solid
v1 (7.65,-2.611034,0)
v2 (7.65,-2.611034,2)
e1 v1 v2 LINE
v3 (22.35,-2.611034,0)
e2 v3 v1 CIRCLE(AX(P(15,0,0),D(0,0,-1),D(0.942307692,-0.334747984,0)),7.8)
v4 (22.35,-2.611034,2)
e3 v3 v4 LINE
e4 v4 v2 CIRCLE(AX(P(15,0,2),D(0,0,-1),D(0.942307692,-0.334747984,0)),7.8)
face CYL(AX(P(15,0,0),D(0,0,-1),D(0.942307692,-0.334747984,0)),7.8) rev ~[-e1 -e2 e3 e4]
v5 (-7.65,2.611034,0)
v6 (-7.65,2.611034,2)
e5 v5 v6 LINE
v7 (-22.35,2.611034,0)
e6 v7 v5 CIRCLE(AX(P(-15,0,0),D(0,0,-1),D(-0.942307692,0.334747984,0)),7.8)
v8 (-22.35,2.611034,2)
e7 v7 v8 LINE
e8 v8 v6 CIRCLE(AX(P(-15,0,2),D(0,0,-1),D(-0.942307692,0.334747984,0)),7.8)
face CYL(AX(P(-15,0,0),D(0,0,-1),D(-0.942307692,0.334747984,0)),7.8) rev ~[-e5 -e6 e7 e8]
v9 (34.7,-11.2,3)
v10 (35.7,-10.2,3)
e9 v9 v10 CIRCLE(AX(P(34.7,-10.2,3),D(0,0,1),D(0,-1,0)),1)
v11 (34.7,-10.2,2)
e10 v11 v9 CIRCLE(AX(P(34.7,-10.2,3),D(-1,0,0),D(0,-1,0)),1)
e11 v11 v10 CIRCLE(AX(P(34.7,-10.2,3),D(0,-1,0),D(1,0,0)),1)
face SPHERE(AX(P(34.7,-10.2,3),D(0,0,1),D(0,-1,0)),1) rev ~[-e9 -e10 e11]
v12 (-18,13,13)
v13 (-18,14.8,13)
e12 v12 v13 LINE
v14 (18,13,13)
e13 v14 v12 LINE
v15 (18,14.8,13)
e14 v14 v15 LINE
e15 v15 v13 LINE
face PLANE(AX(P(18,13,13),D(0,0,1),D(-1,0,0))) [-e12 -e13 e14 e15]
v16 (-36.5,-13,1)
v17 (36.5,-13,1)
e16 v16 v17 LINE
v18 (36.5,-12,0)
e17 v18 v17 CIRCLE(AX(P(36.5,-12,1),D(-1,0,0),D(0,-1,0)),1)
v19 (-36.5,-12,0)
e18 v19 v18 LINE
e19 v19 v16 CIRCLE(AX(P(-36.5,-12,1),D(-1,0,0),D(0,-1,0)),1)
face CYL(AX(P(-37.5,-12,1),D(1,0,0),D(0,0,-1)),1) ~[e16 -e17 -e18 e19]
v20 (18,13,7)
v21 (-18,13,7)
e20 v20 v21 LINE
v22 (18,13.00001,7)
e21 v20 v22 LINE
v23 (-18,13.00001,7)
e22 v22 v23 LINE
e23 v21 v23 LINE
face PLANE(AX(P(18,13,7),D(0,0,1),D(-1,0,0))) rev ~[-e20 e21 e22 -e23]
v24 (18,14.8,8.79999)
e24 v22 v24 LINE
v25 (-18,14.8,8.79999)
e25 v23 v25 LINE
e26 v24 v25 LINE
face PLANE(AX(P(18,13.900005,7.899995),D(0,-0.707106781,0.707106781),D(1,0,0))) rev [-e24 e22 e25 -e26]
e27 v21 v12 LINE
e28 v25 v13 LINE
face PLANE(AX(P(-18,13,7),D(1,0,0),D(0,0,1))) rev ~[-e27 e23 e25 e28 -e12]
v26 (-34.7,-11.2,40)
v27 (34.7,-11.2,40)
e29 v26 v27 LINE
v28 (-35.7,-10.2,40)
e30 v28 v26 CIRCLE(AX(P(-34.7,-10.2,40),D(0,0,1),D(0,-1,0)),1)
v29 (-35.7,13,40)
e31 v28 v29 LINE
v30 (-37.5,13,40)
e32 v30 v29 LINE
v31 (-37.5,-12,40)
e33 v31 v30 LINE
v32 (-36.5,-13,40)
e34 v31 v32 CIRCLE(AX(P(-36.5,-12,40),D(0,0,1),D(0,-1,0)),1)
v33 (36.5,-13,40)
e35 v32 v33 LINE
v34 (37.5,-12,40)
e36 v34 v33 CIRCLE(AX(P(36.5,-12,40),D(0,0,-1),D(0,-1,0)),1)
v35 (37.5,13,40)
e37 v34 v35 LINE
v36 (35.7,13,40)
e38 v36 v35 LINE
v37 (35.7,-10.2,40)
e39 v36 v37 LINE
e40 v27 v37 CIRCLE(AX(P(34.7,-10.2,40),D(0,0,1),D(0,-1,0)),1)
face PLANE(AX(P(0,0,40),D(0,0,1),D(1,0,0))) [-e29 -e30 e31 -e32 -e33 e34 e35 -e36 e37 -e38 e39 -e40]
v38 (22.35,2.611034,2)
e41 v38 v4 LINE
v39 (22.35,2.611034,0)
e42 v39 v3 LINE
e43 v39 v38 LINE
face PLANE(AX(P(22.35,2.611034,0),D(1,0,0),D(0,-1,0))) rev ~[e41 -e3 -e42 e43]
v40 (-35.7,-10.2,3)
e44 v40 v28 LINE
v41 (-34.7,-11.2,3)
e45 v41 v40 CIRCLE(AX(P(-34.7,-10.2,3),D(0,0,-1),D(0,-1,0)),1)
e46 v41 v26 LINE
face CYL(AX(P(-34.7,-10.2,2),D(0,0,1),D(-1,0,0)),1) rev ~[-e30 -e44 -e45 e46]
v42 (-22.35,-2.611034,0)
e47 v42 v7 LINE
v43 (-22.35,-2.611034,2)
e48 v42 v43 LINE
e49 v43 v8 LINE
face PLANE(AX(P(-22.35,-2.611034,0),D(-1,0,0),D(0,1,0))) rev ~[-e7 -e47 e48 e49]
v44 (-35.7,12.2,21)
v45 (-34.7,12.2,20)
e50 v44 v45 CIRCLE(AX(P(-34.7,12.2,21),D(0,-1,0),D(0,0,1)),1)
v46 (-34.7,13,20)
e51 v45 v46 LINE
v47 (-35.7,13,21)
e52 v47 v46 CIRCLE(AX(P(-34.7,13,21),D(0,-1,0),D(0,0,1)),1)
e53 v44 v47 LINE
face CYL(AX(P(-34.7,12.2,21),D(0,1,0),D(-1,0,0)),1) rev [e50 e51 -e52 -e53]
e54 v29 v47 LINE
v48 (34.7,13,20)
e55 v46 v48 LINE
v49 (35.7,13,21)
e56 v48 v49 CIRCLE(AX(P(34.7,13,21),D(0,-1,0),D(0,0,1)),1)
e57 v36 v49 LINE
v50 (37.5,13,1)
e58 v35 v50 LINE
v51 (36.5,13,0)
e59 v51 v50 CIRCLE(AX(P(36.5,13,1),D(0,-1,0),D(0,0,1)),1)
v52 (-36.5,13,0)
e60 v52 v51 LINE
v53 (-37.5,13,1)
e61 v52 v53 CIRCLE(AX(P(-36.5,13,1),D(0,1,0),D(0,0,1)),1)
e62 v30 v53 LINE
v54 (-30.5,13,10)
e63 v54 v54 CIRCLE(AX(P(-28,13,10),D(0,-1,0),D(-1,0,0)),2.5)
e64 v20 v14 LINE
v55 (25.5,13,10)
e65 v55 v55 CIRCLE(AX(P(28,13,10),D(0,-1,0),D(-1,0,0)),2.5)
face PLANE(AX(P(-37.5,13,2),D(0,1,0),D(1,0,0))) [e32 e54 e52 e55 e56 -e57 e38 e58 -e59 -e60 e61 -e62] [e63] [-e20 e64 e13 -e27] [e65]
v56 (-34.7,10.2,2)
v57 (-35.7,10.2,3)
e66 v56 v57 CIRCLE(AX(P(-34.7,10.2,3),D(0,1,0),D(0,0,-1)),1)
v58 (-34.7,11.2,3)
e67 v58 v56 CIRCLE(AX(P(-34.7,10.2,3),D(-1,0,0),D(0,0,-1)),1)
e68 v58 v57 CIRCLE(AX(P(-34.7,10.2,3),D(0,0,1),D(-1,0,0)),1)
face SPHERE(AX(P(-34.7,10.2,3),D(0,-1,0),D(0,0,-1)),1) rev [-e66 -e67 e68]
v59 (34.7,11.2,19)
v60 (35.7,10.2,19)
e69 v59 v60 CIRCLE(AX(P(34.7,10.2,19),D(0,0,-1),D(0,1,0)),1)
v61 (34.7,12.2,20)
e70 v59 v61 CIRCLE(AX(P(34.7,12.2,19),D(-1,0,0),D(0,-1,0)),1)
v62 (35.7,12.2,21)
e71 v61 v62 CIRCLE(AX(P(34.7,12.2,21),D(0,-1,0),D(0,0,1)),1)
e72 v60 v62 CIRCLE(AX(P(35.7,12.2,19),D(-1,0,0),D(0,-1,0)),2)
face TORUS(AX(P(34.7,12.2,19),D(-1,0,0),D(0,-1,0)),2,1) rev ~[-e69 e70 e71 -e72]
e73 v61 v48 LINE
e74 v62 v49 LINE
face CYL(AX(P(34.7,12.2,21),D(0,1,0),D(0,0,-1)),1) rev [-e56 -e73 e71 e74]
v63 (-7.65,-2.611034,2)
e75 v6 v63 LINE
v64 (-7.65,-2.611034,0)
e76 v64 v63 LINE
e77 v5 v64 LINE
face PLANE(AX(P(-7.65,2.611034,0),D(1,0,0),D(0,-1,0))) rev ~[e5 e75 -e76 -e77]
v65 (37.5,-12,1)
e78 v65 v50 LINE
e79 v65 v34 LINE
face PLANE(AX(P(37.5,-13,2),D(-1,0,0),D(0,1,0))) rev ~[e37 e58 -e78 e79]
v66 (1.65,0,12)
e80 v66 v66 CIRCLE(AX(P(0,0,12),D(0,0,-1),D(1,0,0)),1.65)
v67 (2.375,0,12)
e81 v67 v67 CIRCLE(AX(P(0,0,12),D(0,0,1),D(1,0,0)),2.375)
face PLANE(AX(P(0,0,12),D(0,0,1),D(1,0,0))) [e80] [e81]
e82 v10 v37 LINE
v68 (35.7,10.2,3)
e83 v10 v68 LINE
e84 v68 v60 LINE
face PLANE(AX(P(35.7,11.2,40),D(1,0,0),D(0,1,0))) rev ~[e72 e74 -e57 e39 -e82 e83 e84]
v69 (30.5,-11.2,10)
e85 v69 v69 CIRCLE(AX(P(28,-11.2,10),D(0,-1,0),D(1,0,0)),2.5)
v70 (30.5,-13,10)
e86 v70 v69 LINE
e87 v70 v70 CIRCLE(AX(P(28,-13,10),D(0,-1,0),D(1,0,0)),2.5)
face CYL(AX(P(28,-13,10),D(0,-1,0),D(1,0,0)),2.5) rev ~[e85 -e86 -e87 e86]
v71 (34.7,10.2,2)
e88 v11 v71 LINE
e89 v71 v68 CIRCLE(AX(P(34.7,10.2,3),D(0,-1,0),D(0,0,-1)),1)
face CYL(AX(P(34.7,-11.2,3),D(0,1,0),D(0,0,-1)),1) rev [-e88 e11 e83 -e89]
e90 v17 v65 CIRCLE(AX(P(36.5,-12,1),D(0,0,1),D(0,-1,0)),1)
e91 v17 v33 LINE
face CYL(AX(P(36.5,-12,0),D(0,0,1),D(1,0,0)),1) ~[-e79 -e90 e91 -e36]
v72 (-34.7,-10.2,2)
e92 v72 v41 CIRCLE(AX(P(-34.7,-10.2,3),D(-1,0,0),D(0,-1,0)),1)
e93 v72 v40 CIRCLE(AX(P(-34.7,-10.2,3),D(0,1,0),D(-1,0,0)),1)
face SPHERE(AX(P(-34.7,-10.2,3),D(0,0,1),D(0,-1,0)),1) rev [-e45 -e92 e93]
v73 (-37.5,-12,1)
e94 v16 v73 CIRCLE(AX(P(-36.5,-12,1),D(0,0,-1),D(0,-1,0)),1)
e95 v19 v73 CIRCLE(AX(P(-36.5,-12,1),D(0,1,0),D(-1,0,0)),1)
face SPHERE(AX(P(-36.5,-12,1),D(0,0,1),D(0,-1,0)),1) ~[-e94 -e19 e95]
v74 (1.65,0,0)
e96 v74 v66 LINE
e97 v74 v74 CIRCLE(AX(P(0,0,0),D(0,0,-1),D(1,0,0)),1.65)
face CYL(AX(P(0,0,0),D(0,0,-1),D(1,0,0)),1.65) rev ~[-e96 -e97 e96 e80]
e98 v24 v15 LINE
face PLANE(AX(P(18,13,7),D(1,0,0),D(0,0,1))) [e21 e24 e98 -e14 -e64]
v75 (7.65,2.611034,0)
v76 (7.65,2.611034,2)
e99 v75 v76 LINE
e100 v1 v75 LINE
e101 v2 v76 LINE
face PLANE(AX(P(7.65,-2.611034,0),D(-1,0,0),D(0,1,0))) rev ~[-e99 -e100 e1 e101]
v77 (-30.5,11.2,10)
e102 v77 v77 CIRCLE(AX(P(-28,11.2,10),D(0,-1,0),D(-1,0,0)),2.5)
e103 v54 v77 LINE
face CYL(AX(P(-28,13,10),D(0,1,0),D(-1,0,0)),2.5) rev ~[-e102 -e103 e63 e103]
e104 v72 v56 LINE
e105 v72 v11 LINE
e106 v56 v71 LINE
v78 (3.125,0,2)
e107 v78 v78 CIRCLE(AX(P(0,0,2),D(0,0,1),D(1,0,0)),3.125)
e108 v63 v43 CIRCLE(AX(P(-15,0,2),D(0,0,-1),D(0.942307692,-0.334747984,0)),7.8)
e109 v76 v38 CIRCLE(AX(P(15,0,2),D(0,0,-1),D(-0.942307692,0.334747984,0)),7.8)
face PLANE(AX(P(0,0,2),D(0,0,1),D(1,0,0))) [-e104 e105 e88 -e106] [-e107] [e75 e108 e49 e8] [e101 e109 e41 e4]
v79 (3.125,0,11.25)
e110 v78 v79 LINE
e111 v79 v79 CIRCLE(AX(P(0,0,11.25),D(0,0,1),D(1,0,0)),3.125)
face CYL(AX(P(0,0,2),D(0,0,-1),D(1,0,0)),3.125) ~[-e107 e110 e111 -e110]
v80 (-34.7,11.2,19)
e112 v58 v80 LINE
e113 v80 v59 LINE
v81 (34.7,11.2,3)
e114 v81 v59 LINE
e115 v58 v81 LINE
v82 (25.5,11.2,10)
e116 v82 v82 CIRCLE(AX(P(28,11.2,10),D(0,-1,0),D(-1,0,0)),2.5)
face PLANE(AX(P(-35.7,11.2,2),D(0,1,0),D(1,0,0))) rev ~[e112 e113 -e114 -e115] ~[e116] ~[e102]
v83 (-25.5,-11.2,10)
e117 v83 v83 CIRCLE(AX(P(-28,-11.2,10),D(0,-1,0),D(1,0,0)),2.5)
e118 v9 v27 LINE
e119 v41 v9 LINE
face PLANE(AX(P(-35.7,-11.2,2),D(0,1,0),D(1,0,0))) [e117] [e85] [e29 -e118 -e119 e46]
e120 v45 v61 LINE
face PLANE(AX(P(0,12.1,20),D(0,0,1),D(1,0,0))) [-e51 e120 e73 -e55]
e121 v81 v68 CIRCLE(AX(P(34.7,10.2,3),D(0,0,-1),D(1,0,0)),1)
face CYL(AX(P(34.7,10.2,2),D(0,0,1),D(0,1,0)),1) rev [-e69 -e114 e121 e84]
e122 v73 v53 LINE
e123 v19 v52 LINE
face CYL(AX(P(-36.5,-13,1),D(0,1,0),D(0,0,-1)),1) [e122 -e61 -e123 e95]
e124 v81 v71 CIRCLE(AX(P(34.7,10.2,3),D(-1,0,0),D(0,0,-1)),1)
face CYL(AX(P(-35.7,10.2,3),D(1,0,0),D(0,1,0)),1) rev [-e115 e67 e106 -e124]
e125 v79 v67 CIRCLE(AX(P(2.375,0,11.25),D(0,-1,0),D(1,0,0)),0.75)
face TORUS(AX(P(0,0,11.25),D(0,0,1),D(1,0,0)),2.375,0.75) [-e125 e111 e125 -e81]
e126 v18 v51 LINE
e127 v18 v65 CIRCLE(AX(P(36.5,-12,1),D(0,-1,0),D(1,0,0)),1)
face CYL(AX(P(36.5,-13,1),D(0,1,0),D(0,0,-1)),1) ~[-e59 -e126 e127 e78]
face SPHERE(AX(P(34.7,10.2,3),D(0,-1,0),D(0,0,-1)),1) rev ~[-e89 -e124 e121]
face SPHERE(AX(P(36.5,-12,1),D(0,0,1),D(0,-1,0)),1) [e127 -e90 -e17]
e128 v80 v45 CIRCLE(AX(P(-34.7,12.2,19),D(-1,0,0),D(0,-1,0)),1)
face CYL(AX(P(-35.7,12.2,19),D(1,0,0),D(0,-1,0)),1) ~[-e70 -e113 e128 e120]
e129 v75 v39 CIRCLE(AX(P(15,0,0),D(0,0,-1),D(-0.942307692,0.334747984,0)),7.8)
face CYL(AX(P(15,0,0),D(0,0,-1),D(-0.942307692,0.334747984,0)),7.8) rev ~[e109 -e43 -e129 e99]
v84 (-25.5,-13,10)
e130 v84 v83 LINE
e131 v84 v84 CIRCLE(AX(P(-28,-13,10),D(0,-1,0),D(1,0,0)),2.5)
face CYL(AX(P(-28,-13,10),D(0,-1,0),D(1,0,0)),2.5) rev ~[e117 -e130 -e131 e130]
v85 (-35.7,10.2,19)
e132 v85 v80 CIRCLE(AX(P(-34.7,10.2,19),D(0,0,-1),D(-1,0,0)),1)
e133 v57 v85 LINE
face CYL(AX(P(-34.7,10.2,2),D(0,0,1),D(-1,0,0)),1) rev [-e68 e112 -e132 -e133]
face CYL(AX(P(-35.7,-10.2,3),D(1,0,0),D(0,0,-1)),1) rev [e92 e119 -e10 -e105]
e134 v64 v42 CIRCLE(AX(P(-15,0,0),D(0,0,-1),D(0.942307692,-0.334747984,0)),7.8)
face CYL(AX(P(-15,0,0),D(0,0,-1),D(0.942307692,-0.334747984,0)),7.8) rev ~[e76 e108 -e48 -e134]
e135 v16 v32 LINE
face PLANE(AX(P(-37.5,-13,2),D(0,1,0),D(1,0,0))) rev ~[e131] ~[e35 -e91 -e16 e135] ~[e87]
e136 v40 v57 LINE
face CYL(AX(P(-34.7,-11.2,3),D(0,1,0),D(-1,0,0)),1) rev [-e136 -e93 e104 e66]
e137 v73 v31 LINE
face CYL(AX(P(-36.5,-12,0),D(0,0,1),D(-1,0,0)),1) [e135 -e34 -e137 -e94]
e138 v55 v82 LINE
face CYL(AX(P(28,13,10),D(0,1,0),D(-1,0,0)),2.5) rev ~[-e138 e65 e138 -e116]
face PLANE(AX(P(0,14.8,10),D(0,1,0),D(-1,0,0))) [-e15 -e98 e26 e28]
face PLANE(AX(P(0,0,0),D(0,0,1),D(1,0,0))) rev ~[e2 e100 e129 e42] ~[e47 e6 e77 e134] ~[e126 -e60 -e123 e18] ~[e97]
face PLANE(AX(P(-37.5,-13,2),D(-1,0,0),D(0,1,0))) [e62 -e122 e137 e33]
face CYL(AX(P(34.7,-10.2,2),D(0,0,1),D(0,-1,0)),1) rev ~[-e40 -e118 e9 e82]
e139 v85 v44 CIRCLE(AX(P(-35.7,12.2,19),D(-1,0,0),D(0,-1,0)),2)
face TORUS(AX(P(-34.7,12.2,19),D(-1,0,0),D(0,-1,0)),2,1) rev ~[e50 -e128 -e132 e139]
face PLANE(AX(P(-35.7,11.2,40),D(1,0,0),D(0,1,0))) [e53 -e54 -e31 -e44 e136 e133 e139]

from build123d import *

# Parameters (mm, degrees)
F0_W      = 75
F0_H      = 26
F1_DEPTH  = 2
F2_W      = 75
F2_H      = 26
F2_W_2    = 71.4
F2_H_2    = 22.4
F3_DEPTH  = 38
F5_DEPTH  = 2
F6_R      = 2.5
F7_DEPTH  = 1.8
F8_W      = 36
F8_H      = 6
F9_DEPTH  = 1.8
F10_SIZE  = 1.79999
F11_W     = 71.4
F11_H     = 1.8
F12_DEPTH = 20
F13_R     = 3.125
F14_DEPTH = 10
F15_R     = 0.75
F16_R     = 1.65
F17_DEPTH = 40.001
F18_F1_R  = 1
F18_F2_R  = 1
F19_R     = 2.5
F20_DEPTH = 27.801


# Not quite as in the source:
# - a fillet or chamfer is up to 0.001 mm smaller than in the source, because OpenCascade refuses the exact size


with BuildPart() as f1:
    # F0 (on Top) → F1 (new body)
    with BuildSketch(Plane.XY):
        Rectangle(F0_W, F0_H)
    extrude(amount=F1_DEPTH)

    # F2 (on face) → F3 (join)
    with BuildSketch(Plane.XY.offset(2)):
        Rectangle(F2_W, F2_H)
        Rectangle(F2_W_2, F2_H_2, mode=Mode.SUBTRACT)
    extrude(amount=F3_DEPTH)

    # F4 (on face) → F5 (cut, through all)
    with BuildSketch(Plane(origin=(0, 0, 0), x_dir=(1, 0, 0), z_dir=(0, 0, -1))):
        with BuildLine():
            Line((-22.35, 2.6110342778), (-22.35, -2.6110342778))
            ThreePointArc((-22.35, -2.6110342778), (-15, -7.8), (-7.65, -2.6110342778))
            Line((-7.65, -2.6110342778), (-7.65, 2.6110342778))
            ThreePointArc((-7.65, 2.6110342778), (-15, 7.8), (-22.35, 2.6110342778))
        make_face()
        with BuildLine():
            ThreePointArc((22.35, 2.6110342778), (15, 7.8), (7.65, 2.6110342778))
            Line((7.65, 2.6110342778), (7.65, -2.6110342778))
            ThreePointArc((7.65, -2.6110342778), (15, -7.8), (22.35, -2.6110342778))
            Line((22.35, -2.6110342778), (22.35, 2.6110342778))
        make_face()
    extrude(amount=-F5_DEPTH, mode=Mode.SUBTRACT)

    # F6 (on face) → F7 (cut, through all)
    with BuildSketch(Plane(origin=(0, 13, 0), x_dir=(-1, 0, 0), z_dir=(0, 1, 0))):
        with Locations((28, 10)):
            Circle(F6_R)
        with Locations((-28, 10)):
            Circle(F6_R)
    extrude(amount=-F7_DEPTH, mode=Mode.SUBTRACT)

    # F8 (on face) → F9 (join)
    with BuildSketch(Plane(origin=(0, 13, 0), x_dir=(-1, 0, 0), z_dir=(0, 1, 0))):
        with Locations((0, 10)):
            Rectangle(F8_W, F8_H)
    extrude(amount=F9_DEPTH)

    # F10 (size 1.8 in the source; OpenCascade refuses exactly that, so slightly less here)
    f10_edges = [f1.edges().sort_by_distance(p)[0] for p in [
        (0, 14.8, 7),
    ]]
    chamfer(f10_edges, length=F10_SIZE)

    # F11 (on face) → F12 (cut)
    with BuildSketch(Plane.XY.offset(40)):
        with Locations((0, 12.1)):
            Rectangle(F11_W, F11_H)
    extrude(amount=-F12_DEPTH, mode=Mode.SUBTRACT)

    # F13 (on face) → F14 (join)
    with BuildSketch(Plane.XY.offset(2)):
        Circle(F13_R)
    extrude(amount=F14_DEPTH)

    # F15
    f15_edges = [f1.edges().sort_by_distance(p)[0] for p in [
        (-3.125, 0, 12),
    ]]
    fillet(f15_edges, radius=F15_R)

    # F16 (on face) → F17 (cut, through all)
    with BuildSketch(Plane(origin=(0, 0, 0), x_dir=(1, 0, 0), z_dir=(0, 0, -1))):
        Circle(F16_R)
    extrude(amount=-F17_DEPTH, mode=Mode.SUBTRACT)

    # F18: fillet of radius 1 on 14 edges, made by hand

    # F18_f1
    f18_f1_edges = [f1.edges().sort_by_distance(p)[0] for p in [
        (-37.5, -13, 20),
        (37.5, -13, 20),
        (0, -13, 0),
        (37.5, 0, 0),
        (-37.5, 0, 0),
        (0, 11.2, 20),
    ]]
    fillet(f18_f1_edges, radius=F18_F1_R)

    # F18_f2
    f18_f2_edges = [f1.edges().sort_by_distance(p)[0] for p in [
        (-35.7, -11.2, 21),
        (35.7, -11.2, 21),
        (0, -11.2, 2),
        (35.7, 0, 2),
        (-35.7, 0, 2),
        (0, 11.2, 2),
        (35.7, 11.2, 10.5),
        (-35.7, 11.2, 10.5),
        (-35.7, 11.4928932188, 19.7071067812),
        (35.7, 11.4928932188, 19.7071067812),
    ]]
    fillet(f18_f2_edges, radius=F18_F2_R)

    # F19 (on face) → F20 (cut, through all)
    with BuildSketch(Plane.XZ.offset(13)):
        with Locations((28, 10)):
            Circle(F19_R)
        with Locations((-28, 10)):
            Circle(F19_R)
    extrude(amount=-F20_DEPTH, mode=Mode.SUBTRACT)


solid = f1.part
